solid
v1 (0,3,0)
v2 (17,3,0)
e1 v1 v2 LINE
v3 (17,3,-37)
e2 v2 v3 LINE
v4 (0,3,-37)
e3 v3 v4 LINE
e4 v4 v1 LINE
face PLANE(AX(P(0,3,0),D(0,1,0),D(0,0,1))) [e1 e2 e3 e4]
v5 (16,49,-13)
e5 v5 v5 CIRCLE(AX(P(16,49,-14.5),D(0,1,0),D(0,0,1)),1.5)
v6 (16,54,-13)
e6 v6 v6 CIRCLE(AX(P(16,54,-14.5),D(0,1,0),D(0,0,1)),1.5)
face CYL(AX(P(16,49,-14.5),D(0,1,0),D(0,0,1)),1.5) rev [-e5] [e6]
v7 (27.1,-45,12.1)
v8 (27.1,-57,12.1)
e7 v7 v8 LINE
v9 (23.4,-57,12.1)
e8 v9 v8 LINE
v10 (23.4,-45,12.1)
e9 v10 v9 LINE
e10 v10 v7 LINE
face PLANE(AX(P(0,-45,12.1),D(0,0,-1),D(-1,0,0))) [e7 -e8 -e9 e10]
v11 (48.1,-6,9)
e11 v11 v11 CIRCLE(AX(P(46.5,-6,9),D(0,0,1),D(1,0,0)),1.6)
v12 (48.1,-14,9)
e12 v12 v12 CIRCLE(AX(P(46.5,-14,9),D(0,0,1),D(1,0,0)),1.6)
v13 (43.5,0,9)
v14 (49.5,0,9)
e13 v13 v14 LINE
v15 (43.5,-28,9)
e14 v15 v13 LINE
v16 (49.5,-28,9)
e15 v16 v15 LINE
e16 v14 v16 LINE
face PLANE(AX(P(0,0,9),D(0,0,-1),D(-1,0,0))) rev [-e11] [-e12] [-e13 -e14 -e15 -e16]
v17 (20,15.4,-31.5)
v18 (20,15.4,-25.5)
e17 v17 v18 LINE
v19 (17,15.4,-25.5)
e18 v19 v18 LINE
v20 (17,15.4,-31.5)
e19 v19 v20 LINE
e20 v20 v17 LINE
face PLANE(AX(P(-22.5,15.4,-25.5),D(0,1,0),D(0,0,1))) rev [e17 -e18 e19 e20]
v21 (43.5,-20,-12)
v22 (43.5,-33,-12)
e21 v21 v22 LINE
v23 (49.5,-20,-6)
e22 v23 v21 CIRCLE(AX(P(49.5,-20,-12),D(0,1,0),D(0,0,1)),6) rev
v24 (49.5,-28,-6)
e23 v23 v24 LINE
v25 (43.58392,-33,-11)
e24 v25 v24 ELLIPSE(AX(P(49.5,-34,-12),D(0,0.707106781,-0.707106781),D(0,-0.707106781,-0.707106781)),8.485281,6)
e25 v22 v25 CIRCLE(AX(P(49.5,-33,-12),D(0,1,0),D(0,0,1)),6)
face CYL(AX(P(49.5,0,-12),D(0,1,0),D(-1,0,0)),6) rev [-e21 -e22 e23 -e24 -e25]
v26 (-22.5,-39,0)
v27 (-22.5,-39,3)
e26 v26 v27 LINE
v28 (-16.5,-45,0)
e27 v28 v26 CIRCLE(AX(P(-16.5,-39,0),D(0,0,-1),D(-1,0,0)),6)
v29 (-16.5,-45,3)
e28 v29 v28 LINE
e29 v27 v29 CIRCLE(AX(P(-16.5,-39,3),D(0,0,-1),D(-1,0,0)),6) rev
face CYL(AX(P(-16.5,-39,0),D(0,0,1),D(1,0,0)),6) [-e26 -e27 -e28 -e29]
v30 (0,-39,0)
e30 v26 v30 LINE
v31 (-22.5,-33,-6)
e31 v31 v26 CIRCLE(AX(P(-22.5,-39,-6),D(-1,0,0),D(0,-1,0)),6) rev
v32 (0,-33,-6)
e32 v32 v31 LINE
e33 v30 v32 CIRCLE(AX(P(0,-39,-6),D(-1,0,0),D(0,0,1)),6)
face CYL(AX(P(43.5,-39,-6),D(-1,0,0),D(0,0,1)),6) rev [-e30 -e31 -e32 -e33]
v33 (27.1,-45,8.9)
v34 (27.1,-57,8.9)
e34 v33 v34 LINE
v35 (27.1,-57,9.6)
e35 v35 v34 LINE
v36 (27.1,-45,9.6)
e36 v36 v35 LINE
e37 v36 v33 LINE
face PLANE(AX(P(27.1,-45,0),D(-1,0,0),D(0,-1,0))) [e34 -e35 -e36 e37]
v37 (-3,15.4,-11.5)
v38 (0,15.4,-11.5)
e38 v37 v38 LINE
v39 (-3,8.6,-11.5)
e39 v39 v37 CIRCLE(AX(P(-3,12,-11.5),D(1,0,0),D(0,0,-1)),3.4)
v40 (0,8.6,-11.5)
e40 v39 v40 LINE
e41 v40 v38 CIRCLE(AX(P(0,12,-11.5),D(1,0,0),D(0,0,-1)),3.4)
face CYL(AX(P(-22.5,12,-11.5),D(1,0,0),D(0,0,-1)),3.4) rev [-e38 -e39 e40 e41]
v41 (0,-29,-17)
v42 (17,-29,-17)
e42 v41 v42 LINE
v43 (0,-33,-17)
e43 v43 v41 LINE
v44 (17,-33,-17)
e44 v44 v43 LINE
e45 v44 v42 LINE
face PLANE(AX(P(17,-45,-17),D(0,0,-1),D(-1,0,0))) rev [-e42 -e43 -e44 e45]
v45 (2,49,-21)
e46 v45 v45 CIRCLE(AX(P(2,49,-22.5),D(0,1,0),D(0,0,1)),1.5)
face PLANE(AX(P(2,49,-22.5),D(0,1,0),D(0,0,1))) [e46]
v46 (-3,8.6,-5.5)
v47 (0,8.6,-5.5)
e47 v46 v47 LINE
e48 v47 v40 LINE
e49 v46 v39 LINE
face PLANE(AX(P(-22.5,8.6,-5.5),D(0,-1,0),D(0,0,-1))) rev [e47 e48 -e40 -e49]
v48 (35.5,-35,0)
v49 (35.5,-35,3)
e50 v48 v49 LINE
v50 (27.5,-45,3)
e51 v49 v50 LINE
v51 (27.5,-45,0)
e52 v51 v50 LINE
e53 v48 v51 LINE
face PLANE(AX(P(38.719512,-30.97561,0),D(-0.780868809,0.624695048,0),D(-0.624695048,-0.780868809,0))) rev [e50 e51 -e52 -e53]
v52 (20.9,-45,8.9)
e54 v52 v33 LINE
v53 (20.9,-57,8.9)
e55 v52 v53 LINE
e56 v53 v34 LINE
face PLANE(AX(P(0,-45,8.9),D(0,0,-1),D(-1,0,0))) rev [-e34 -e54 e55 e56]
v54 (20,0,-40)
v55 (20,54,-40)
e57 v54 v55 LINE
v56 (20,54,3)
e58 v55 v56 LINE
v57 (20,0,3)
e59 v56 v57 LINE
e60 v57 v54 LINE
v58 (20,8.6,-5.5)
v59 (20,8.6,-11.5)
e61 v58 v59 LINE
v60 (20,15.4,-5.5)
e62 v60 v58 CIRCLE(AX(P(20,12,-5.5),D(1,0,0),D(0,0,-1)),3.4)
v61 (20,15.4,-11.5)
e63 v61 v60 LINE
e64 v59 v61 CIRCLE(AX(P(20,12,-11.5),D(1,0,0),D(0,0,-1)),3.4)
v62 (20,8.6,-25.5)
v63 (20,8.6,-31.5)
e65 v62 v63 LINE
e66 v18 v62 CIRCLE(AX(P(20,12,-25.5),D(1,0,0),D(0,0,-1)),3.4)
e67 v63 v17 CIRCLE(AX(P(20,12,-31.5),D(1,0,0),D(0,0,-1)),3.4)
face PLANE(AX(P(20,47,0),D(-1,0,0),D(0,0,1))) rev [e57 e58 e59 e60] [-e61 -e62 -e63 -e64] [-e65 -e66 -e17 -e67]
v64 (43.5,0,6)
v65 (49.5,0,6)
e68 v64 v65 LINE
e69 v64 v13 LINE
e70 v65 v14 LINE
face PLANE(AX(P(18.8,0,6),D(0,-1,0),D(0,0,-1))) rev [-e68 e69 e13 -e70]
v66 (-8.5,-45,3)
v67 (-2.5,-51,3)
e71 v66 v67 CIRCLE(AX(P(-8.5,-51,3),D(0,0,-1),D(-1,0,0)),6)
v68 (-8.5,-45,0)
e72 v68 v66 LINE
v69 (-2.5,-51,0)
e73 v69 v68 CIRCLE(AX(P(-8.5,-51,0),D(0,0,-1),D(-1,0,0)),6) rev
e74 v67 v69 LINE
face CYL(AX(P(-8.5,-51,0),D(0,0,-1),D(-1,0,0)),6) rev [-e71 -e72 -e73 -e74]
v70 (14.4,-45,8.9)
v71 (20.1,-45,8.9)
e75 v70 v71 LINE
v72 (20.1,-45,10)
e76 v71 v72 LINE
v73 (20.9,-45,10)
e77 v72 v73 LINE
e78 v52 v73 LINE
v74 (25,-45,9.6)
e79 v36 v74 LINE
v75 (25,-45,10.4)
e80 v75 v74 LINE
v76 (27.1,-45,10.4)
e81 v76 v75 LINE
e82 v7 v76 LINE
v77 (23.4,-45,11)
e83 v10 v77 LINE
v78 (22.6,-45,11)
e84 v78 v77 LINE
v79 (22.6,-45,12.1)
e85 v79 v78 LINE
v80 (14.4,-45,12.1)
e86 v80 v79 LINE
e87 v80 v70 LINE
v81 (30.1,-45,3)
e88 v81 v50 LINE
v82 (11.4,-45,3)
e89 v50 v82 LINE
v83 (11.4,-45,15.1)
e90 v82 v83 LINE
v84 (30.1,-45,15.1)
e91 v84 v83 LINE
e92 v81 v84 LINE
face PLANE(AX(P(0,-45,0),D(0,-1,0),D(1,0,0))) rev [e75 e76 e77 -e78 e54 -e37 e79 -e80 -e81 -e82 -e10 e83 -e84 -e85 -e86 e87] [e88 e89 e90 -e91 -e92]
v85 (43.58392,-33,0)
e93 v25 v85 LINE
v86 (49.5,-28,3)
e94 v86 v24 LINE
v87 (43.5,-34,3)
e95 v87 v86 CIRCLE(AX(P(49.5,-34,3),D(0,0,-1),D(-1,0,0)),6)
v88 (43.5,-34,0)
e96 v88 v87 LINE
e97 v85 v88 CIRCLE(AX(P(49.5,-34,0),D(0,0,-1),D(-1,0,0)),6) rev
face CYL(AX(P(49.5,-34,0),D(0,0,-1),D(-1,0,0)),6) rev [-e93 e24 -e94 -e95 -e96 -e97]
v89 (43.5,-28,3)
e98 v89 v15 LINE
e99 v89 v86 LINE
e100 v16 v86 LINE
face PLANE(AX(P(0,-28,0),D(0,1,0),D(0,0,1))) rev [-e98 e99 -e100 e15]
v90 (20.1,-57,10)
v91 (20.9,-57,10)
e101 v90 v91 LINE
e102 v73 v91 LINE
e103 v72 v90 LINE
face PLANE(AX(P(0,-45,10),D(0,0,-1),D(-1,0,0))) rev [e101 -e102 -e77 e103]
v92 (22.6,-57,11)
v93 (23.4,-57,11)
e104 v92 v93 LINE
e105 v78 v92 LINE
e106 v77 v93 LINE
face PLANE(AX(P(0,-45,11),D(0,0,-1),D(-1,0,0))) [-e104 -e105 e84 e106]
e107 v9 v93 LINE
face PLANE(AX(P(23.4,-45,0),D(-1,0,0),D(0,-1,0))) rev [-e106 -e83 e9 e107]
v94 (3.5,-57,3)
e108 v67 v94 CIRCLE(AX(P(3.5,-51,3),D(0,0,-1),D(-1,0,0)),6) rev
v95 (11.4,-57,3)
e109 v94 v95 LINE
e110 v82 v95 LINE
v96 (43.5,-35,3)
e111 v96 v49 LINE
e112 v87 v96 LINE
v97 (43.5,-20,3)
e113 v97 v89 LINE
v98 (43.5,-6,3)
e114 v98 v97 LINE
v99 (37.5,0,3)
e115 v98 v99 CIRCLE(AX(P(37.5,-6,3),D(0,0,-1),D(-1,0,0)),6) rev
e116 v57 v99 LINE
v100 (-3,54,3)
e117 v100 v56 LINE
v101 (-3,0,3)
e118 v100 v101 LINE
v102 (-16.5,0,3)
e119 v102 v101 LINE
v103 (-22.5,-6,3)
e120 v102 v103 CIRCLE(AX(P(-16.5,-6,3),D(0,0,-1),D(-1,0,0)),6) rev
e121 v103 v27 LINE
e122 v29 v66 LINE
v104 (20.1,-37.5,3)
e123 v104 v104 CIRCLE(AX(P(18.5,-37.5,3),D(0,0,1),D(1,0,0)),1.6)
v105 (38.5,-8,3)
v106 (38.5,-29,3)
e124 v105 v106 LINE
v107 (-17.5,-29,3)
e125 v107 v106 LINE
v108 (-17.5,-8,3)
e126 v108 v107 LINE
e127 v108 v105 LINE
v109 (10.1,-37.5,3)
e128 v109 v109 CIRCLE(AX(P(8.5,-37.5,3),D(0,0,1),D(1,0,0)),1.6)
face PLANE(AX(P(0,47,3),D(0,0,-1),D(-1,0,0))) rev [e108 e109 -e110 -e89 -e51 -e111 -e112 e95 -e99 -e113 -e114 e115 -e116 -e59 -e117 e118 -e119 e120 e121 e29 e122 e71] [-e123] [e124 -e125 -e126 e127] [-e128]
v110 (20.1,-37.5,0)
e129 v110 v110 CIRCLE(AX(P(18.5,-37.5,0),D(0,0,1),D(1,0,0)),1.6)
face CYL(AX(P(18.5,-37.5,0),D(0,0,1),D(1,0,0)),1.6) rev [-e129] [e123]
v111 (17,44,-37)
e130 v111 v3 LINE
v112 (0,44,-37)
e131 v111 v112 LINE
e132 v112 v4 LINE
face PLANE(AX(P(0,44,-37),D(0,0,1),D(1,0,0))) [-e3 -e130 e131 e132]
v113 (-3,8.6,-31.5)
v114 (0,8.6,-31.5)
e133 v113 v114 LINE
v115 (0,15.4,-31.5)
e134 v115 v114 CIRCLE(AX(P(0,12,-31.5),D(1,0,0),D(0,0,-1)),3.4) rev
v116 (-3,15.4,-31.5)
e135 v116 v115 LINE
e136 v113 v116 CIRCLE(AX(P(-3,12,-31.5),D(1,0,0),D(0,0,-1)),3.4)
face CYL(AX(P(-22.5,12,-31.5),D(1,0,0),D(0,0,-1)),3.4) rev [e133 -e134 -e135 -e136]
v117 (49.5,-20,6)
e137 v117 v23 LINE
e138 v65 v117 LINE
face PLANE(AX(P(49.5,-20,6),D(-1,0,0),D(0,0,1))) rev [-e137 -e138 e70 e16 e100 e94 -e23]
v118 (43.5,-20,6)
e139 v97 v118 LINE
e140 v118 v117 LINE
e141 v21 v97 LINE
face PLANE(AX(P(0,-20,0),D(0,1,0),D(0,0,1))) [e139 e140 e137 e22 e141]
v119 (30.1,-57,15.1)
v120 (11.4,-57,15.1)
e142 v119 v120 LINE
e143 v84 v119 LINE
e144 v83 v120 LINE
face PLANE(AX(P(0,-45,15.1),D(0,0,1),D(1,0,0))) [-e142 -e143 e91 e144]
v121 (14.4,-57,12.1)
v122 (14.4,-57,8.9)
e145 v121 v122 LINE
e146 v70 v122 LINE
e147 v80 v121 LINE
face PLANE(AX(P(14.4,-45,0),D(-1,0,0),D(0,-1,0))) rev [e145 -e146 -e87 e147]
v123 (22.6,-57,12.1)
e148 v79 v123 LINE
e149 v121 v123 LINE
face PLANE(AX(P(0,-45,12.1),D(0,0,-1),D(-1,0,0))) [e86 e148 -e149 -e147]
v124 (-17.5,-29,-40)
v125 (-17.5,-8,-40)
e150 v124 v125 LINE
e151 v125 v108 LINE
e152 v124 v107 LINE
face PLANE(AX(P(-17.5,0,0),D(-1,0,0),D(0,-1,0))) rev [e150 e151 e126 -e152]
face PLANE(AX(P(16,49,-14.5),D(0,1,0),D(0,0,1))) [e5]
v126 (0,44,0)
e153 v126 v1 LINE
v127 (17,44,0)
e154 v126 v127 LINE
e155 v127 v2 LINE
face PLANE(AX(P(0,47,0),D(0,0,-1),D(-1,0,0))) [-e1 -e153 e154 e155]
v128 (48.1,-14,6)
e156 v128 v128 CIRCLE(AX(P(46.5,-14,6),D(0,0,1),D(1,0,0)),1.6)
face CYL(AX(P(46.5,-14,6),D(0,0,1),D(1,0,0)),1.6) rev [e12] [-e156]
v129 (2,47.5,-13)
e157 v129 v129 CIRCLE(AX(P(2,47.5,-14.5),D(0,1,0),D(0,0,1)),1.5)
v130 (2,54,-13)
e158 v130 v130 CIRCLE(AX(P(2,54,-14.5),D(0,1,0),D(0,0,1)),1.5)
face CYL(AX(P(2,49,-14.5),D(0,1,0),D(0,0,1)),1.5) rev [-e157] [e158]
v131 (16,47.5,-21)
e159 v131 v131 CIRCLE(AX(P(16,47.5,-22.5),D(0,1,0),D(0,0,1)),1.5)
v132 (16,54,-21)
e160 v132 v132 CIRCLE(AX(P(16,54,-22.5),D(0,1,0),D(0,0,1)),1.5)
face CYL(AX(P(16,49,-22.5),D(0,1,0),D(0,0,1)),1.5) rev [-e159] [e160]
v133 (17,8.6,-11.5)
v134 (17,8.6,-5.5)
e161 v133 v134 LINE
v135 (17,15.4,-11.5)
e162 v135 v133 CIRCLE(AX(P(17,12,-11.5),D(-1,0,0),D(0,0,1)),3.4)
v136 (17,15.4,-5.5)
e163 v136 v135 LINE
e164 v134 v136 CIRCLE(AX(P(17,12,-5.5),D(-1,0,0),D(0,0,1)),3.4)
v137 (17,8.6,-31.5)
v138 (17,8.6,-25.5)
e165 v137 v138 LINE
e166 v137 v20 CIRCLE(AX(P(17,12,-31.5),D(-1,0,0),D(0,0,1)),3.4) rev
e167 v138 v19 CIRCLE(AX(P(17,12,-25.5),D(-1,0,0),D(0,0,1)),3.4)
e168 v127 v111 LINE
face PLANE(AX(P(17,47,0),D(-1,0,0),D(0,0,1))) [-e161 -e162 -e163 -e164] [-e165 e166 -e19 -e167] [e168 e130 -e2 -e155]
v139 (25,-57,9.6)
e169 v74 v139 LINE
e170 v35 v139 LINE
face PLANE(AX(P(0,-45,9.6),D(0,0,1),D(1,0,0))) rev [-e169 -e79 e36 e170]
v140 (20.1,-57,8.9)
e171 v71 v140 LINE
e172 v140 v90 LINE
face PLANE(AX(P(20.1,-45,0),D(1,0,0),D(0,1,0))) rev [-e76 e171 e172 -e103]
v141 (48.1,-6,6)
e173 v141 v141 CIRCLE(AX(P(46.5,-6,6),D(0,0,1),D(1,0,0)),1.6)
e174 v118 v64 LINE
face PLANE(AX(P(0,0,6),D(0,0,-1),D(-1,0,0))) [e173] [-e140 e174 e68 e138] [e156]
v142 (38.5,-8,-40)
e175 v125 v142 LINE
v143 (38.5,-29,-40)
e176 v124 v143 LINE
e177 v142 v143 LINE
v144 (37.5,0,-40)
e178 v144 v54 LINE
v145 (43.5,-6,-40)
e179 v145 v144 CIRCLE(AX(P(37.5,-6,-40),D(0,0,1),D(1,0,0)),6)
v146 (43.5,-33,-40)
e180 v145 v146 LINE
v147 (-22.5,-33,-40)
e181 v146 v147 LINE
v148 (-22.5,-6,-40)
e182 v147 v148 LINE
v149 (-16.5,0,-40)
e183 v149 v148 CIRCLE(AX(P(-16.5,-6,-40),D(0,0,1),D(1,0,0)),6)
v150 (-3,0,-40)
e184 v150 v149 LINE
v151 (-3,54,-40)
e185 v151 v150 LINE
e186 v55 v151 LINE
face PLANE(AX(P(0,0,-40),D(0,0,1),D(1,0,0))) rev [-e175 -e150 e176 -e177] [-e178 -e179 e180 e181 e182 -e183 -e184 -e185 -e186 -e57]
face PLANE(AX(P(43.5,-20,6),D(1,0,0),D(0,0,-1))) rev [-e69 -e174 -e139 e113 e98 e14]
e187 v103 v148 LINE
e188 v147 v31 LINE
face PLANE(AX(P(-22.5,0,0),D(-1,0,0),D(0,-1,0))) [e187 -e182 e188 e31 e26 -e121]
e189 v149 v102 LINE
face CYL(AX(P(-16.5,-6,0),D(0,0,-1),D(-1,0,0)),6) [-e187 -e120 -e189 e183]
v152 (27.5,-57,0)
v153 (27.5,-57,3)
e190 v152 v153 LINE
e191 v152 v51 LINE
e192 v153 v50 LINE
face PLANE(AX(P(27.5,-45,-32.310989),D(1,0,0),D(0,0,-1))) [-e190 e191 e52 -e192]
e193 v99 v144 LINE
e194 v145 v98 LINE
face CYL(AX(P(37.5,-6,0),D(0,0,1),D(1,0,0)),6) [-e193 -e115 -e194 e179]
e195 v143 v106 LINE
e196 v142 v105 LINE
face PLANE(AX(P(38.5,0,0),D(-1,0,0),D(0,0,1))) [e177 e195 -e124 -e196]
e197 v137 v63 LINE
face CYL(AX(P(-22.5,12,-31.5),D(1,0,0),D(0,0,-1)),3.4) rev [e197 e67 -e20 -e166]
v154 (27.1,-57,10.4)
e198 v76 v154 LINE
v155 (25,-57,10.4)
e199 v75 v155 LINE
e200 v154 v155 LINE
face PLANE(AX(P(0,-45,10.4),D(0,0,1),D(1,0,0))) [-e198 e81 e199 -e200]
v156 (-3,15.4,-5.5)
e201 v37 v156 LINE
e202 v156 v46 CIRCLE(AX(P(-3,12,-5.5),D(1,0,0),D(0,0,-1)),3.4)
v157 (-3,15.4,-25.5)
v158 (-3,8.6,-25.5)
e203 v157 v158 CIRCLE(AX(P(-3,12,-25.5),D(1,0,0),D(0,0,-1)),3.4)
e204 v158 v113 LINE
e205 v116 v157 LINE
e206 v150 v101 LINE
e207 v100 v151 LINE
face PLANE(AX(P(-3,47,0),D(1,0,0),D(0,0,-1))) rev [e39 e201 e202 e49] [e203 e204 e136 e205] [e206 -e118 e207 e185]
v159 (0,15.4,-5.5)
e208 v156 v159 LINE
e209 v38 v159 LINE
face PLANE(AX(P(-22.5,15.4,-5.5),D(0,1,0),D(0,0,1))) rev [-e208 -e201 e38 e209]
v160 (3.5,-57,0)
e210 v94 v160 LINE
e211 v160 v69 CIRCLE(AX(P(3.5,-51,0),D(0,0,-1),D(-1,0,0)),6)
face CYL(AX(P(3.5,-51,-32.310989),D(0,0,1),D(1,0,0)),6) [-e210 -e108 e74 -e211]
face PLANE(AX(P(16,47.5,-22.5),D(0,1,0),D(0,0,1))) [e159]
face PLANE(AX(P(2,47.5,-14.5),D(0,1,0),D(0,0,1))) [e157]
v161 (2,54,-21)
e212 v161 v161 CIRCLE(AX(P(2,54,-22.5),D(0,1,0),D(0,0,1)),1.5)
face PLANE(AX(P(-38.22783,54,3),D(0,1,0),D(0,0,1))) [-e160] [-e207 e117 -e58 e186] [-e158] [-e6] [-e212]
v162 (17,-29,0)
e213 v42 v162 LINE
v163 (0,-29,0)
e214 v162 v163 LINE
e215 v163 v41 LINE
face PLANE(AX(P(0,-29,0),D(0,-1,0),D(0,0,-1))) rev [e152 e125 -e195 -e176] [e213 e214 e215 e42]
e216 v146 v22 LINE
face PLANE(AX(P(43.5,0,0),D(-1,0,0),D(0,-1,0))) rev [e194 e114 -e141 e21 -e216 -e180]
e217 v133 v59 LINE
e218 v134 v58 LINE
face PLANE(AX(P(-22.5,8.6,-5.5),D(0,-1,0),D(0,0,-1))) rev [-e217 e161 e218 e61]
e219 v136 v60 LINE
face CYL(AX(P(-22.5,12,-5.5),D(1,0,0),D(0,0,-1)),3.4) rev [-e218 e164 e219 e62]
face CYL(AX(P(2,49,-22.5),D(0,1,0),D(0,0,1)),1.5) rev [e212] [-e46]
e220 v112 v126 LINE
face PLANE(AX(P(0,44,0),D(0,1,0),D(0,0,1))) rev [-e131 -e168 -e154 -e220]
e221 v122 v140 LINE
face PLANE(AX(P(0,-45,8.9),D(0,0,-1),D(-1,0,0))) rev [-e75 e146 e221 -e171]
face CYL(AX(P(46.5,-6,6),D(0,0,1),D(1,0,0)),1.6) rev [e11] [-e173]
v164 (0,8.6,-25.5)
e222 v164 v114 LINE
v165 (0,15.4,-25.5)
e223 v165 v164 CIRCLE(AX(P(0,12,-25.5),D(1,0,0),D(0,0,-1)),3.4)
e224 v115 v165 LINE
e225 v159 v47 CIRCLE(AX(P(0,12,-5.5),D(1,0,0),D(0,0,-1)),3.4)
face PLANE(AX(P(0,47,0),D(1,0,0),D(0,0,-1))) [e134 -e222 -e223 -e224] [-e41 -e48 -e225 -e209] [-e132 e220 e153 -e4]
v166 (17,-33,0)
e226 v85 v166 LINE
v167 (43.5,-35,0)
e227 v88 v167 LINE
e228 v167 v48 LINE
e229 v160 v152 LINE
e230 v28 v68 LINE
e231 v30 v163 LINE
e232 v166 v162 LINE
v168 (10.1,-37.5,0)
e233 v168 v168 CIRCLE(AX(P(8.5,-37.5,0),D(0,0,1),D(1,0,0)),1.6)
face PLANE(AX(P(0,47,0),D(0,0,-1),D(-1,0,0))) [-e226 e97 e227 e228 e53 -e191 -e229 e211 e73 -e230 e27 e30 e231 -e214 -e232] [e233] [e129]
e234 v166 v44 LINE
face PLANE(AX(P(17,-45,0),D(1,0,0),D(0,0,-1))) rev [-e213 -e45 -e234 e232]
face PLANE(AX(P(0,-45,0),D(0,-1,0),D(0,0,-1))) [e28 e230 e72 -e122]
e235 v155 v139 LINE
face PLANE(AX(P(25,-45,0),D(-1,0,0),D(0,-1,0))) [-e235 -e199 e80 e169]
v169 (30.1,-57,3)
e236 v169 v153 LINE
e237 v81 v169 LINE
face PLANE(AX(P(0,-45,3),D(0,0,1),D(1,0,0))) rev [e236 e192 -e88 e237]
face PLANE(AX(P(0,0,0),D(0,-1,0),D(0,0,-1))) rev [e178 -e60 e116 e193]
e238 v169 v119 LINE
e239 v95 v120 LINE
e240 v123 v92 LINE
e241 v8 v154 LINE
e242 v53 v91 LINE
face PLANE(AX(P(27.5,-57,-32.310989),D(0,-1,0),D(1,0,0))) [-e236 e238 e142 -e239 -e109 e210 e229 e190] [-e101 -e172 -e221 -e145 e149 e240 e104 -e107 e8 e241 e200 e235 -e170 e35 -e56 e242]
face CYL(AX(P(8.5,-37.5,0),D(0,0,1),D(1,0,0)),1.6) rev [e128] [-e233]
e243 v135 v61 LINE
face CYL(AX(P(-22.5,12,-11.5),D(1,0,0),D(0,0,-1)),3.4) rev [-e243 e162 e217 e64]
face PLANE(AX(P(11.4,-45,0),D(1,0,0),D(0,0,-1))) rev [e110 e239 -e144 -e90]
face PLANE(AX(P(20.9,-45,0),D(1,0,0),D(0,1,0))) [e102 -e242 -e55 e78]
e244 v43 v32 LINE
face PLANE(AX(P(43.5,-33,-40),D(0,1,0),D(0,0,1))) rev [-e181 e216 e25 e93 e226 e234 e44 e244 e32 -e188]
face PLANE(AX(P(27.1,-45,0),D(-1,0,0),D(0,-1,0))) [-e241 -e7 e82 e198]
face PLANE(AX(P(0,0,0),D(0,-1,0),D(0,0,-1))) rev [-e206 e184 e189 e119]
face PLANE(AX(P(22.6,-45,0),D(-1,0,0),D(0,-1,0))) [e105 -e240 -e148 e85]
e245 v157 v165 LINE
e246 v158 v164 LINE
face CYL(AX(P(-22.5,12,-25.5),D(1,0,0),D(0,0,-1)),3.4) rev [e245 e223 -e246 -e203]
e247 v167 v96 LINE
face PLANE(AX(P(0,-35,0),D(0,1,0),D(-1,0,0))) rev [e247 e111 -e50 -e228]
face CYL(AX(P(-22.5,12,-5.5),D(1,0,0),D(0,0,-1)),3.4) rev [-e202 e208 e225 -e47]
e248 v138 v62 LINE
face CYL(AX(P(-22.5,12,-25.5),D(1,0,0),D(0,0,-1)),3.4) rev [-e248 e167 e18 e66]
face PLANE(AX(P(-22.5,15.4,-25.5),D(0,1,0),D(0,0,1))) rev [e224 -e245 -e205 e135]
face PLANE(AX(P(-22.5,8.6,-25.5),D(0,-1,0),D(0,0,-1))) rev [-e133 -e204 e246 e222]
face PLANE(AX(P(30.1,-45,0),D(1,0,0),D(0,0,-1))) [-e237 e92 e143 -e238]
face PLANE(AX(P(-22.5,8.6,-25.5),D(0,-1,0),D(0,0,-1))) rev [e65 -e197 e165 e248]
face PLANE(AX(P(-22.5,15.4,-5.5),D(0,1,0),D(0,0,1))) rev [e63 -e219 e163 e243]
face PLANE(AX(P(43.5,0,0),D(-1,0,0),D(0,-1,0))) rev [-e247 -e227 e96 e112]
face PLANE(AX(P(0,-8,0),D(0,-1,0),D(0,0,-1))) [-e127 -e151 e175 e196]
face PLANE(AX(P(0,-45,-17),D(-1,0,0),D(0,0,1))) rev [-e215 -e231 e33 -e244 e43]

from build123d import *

# Parameters (mm, degrees)
SKETCH_2_W           = 17
SKETCH_2_H           = 17
EXTRUDE_1_DEPTH      = 47
SHELL_2_T            = 3
SKETCH_8_R           = 1.6
SKETCH_8_W           = 56
SKETCH_8_H           = 21
EXTRUDE_2_DEPTH      = 3
SKETCH_9_W           = 66
SKETCH_9_H           = 4
EXTRUDE_3_DEPTH      = 40
SKETCH_11_W          = 13
SKETCH_11_H          = 13
CUT_EXTRUDE_3_DEPTH  = 3
EXTRUDE_START        = -48
SKETCH_13_W          = 17
SKETCH_13_H          = 17
EXTRUDE_4_DEPTH      = 3
SKETCH_17_W          = 17
SKETCH_17_H          = 17
CUT_EXTRUDE_4_DEPTH  = 78.409624725
SKETCH_19_W          = 30
SKETCH_19_H          = 12
EXTRUDE_8_DEPTH      = 3
SKETCH_20_W          = 0.8
SKETCH_20_H          = 1.1
SKETCH_20_W_2        = 2.1
SKETCH_20_H_2        = 0.8
EXTRUDE_9_DEPTH      = 12
FILLET_5_R           = 6
EXTRUDE_11_DEPTH     = 20
EXTRUDE_START_2      = 3
SKETCH_23_W          = 6
SKETCH_23_H          = 28
SKETCH_23_R          = 1.6
EXTRUDE_12_DEPTH     = 3
EXTRUDE_START_3      = -28
SKETCH_24_W          = 6
SKETCH_24_H          = 12
EXTRUDE_13_DEPTH     = 8
FILLET_START         = -40
FILLET_6_DEPTH       = 43
FILLET_START_2       = -6
FILLET_6_2_DEPTH     = 9
FILLET_START_3       = -33
FILLET_6_3_DEPTH     = 13
FILLET_START_4       = -11
FILLET_6_4_DEPTH     = 11
EXTRUDE_START_4      = 12
EXTRUDE_14_DEPTH     = 12
SKETCH_26_W          = 17
SKETCH_26_H          = 29
CUT_EXTRUDE_6_DEPTH  = 50
SKETCH_29_W          = 35
SKETCH_29_H          = 4
EXTRUDE_15_DEPTH     = 23
SKETCH_30_W          = 23
SKETCH_30_H          = 35
EXTRUDE_16_DEPTH     = 10
EXTRUDE_START_5      = 8
EXTRUDE_17_DEPTH     = 8
CUT_EXTRUDE_10_DEPTH = 82.579715616
SKETCH_33_W          = 17
SKETCH_33_H          = 37
CUT_EXTRUDE_11_DEPTH = 44
SKETCH_35_W          = 17
SKETCH_35_H          = 37
EXTRUDE_18_DEPTH     = 3
SKETCH_31_R          = 1.5
CUT_EXTRUDE_13_DEPTH = 5
SKETCH_39_R          = 1.5
CUT_EXTRUDE_14_DEPTH = 1.5


with BuildPart() as part:
    # 草图2 → 凸台-拉伸1 (new body)
    with BuildSketch(Plane(origin=(0, 0, 0), x_dir=(1, 0, 0), z_dir=(0, 1, 0))):
        with Locations((8.5, 8.5)):
            Rectangle(SKETCH_2_W, SKETCH_2_H)
    extrude(amount=EXTRUDE_1_DEPTH)

    # 抽壳2
    shell_2_openings = [part.faces().sort_by_distance(p)[0] for p in [
        (8.5, 0, -8.5),
    ]]
    offset(amount=SHELL_2_T, openings=shell_2_openings, kind=Kind.INTERSECTION)

    # 草图8 → 凸台-拉伸2 (add)
    with BuildSketch(Plane.XY.offset(3)):
        Polygon((-22.5, 0), (43.5, 0), (43.5, -35), (35.5, -35), (27.5, -45), (-22.5, -45), align=None)
        with Locations((8.5, -37.5)):
            Circle(SKETCH_8_R, mode=Mode.SUBTRACT)
        with Locations((18.5, -37.5)):
            Circle(SKETCH_8_R, mode=Mode.SUBTRACT)
        with Locations((10.5, -18.5)):
            Rectangle(SKETCH_8_W, SKETCH_8_H, mode=Mode.SUBTRACT)
    extrude(amount=-EXTRUDE_2_DEPTH)

    # 草图9 → 凸台-拉伸3 (add)
    with BuildSketch(Plane(origin=(0, 0, 0), x_dir=(-1, 0, 0), z_dir=(0, 0, -1))):
        with Locations((-10.5, -31)):
            Rectangle(SKETCH_9_W, SKETCH_9_H)
    extrude(amount=EXTRUDE_3_DEPTH)

    # 草图11 → 切除-拉伸3 (cut)
    with BuildSketch(Plane(origin=(0, 50, 0), x_dir=(1, 0, 0), z_dir=(0, 1, 0))):
        with Locations((8.5, 8.5)):
            Rectangle(SKETCH_11_W, SKETCH_11_H)
    extrude(amount=-CUT_EXTRUDE_3_DEPTH, mode=Mode.SUBTRACT)

    # 草图13 → 凸台-拉伸4 (add)
    with BuildSketch(Plane(origin=(0, 50, 0), x_dir=(1, 0, 0), z_dir=(0, 1, 0)).offset(EXTRUDE_START)):
        with Locations((8.5, 8.5)):
            Rectangle(SKETCH_13_W, SKETCH_13_H)
    extrude(amount=EXTRUDE_4_DEPTH)

    # 草图17 → 切除-拉伸4 (cut, through all)
    with BuildSketch(Plane(origin=(0, 5, 0), x_dir=(1, 0, 0), z_dir=(0, 1, 0))):
        with Locations((8.5, 8.5)):
            Rectangle(SKETCH_17_W, SKETCH_17_H)
    extrude(amount=-CUT_EXTRUDE_4_DEPTH, mode=Mode.SUBTRACT)

    # 草图19 → 凸台-拉伸8 (add)
    with BuildSketch(Plane.XY.offset(3)):
        with Locations((12.5, -51)):
            Rectangle(SKETCH_19_W, SKETCH_19_H)
    extrude(amount=-EXTRUDE_8_DEPTH)

    # 草图20 → 凸台-拉伸9 (add)
    # profile 1 of 4: a face of its own
    with BuildSketch(Plane.XZ.offset(57)):
        Polygon((27.5, 3), (30.1, 3), (30.1, 15.1), (11.4, 15.1), (11.4, 3), align=None)
        Polygon((14.4, 8.9), (14.4, 12.1), (22.6, 12.1), (23.4, 12.1), (27.1, 12.1), (27.1, 10.4), (27.1, 9.6), (27.1, 8.9), (20.9, 8.9), (20.1, 8.9), align=None, mode=Mode.SUBTRACT)
    # profile 2 of 4: a face of its own
    with BuildSketch(Plane.XZ.offset(57)):
        with Locations((23, 11.55)):
            Rectangle(SKETCH_20_W, SKETCH_20_H)
    # profile 3 of 4: a face of its own
    with BuildSketch(Plane.XZ.offset(57)):
        with Locations((20.5, 9.45)):
            Rectangle(SKETCH_20_W, SKETCH_20_H)
    # profile 4 of 4: a face of its own
    with BuildSketch(Plane.XZ.offset(57)):
        with Locations((26.05, 10)):
            Rectangle(SKETCH_20_W_2, SKETCH_20_H_2)
    extrude(amount=-EXTRUDE_9_DEPTH)

    # 圆角5
    fillet_5_edges = [part.edges().sort_by_distance(p)[0] for p in [
        (-11.25, -33, 0),
        (-22.5, -45, 1.5),
        (-2.5, -57, 1.5),
        (-2.5, -45, 1.5),
    ]]
    fillet(fillet_5_edges, radius=FILLET_5_R - 0.0001)  # a hair under: the kernel refuses the full size

    # 草图22 → 凸台-拉伸11 (add)
    with BuildSketch(Plane(origin=(0, 0, 0), x_dir=(-1, 0, 0), z_dir=(0, 0, -1))):
        Polygon((0, 0), (-17, 0), (-20, 0), (-43.5, 0), (-43.5, -29), (-38.5, -29), (-38.5, -8), (17.5, -8), (17.5, -29), (22.5, -29), (22.5, 0), (3, 0), align=None)
    extrude(amount=EXTRUDE_11_DEPTH)



with BuildPart() as body_2:
    # 草图23 → 凸台-拉伸12 (new body)
    with BuildSketch(Plane.XY.offset(3).offset(EXTRUDE_START_2)):
        with Locations((46.5, -14)):
            Rectangle(SKETCH_23_W, SKETCH_23_H)
        with Locations((46.5, -6)):
            Circle(SKETCH_23_R, mode=Mode.SUBTRACT)
        with Locations((46.5, -14)):
            Circle(SKETCH_23_R, mode=Mode.SUBTRACT)
    extrude(amount=EXTRUDE_12_DEPTH)


with BuildPart() as part_1:
    add(part.part)

    add(body_2.part)  # 凸台-拉伸13 merges body 2
    # 草图24 → 凸台-拉伸13 (add)
    with BuildSketch(Plane(origin=(0, 0, 0), x_dir=(1, 0, 0), z_dir=(0, 1, 0)).offset(EXTRUDE_START_3)):
        with Locations((46.5, 0)):
            Rectangle(SKETCH_24_W, SKETCH_24_H)
    extrude(amount=EXTRUDE_13_DEPTH)

    # 圆角6: read off the stored shape, not the designer's step
    # 圆角6 outline → 圆角6 (cut)
    with BuildSketch(Plane.XY.offset(FILLET_START)):
        with BuildLine():
            ThreePointArc((37.5, 0), (41.742640687, -1.757359313), (43.5, -6))
            Line((43.5, -6), (43.5, 0))
            Line((43.5, 0), (37.5, 0))
        make_face()
        with BuildLine():
            Line((-22.5, 0), (-22.5, -6))
            ThreePointArc((-22.5, -6), (-20.742640687, -1.757359313), (-16.5, 0))
            Line((-16.5, 0), (-22.5, 0))
        make_face()
    extrude(amount=FILLET_6_DEPTH, mode=Mode.SUBTRACT)

    # Fillet 6 2 outline → Fillet 6 2 (add)
    with BuildSketch(Plane.XY.offset(FILLET_START_2)):
        with BuildLine():
            Line((43.5, -28), (43.5, -34))
            ThreePointArc((43.5, -34), (45.257359313, -29.757359313), (49.5, -28))
            Line((49.5, -28), (43.5, -28))
        make_face()
    extrude(amount=FILLET_6_2_DEPTH)

    # Fillet 6 3 outline → Fillet 6 3 (add)
    with BuildSketch(Plane(origin=(0, 0, 0), x_dir=(1, 0, 0), z_dir=(0, 1, 0)).offset(FILLET_START_3)):
        with BuildLine():
            ThreePointArc((49.5, 6), (45.257359313, 7.757359313), (43.5, 12))
            Line((43.5, 12), (43.5, 6))
            Line((43.5, 6), (49.5, 6))
        make_face()
    extrude(amount=FILLET_6_3_DEPTH)

    # Fillet 6 4 outline → Fillet 6 4 (cut)
    with BuildSketch(Plane.XY.offset(FILLET_START_4)):
        with BuildLine():
            ThreePointArc((49.5, -28), (45.627016654, -29.417424305), (43.583920217, -33))
            Line((43.583920217, -33), (49.5, -33))
            Line((49.5, -33), (49.5, -28))
        make_face()
        with BuildLine():
            ThreePointArc((43.5, -34), (43.521016863, -33.498242438), (43.583920217, -33))
            Line((43.583920217, -33), (43.5, -33))
            Line((43.5, -33), (43.5, -34))
        make_face()
    extrude(amount=FILLET_6_4_DEPTH, mode=Mode.SUBTRACT)

    # 草图25 → 凸台-拉伸14 (add)
    with BuildSketch(Plane(origin=(0, 0, -20), x_dir=(-1, 0, 0), z_dir=(0, 0, -1)).offset(EXTRUDE_START_4)):
        with BuildLine():
            Line((22.5, -29), (22.5, -6))
            ThreePointArc((22.5, -6), (20.742640687, -1.757359313), (16.5, 0))
            Line((16.5, 0), (3, 0))
            Line((3, 0), (3, 50))
            Line((3, 50), (-20, 50))
            Line((-20, 50), (-20, 0))
            Line((-20, 0), (-37.5, 0))
            ThreePointArc((-37.5, 0), (-41.742640687, -1.757359313), (-43.5, -6))
            Line((-43.5, -6), (-43.5, -29))
            Line((-43.5, -29), (-38.5, -29))
            Line((-38.5, -29), (-38.5, -8))
            Line((-38.5, -8), (17.5, -8))
            Line((17.5, -8), (17.5, -29))
            Line((17.5, -29), (22.5, -29))
        make_face()
    extrude(amount=-EXTRUDE_14_DEPTH)

    # 草图26 → 切除-拉伸6 (cut)
    with BuildSketch(Plane(origin=(0, 50, 0), x_dir=(1, 0, 0), z_dir=(0, 1, 0))):
        with Locations((8.5, 14.5)):
            Rectangle(SKETCH_26_W, SKETCH_26_H)
    extrude(amount=-CUT_EXTRUDE_6_DEPTH, mode=Mode.SUBTRACT)

    # 草图29 → 凸台-拉伸15 (add)
    with BuildSketch(Plane(origin=(20, 0, 0), x_dir=(0, 0, -1), z_dir=(1, 0, 0))):
        with Locations((14.5, 52)):
            Rectangle(SKETCH_29_W, SKETCH_29_H)
    extrude(amount=-EXTRUDE_15_DEPTH)

    # 草图30 → 凸台-拉伸16 (add)
    with BuildSketch(Plane(origin=(0, 54, 0), x_dir=(1, 0, 0), z_dir=(0, 1, 0))):
        with Locations((8.5, 14.5)):
            Rectangle(SKETCH_30_W, SKETCH_30_H)
    extrude(amount=-EXTRUDE_16_DEPTH)

    # 草图32 → 凸台-拉伸17 (add)
    with BuildSketch(Plane(origin=(0, 0, -32), x_dir=(-1, 0, 0), z_dir=(0, 0, -1)).offset(EXTRUDE_START_5)):
        with BuildLine():
            Line((-20, 0), (-37.5, 0))
            ThreePointArc((-37.5, 0), (-41.742640687, -1.757359313), (-43.5, -6))
            Line((-43.5, -6), (-43.5, -29))
            Line((-43.5, -29), (-38.5, -29))
            Line((-38.5, -29), (-38.5, -8))
            Line((-38.5, -8), (17.5, -8))
            Line((17.5, -8), (17.5, -29))
            Line((17.5, -29), (22.5, -29))
            Line((22.5, -29), (22.5, -6))
            ThreePointArc((22.5, -6), (20.742640687, -1.757359313), (16.5, 0))
            Line((16.5, 0), (3, 0))
            Line((3, 0), (3, 54))
            Line((3, 54), (-20, 54))
            Line((-20, 54), (-20, 0))
        make_face()
    extrude(amount=-EXTRUDE_17_DEPTH)

    # 草图34 → 切除-拉伸10 (cut, through all)
    with BuildSketch(Plane(origin=(20, 0, 0), x_dir=(0, 0, -1), z_dir=(1, 0, 0))):
        with BuildLine():
            Line((5.5, 15.4), (11.5, 15.4))
            ThreePointArc((11.5, 15.4), (14.9, 12), (11.5, 8.6))
            Line((11.5, 8.6), (5.5, 8.6))
            ThreePointArc((5.5, 8.6), (2.1, 12), (5.5, 15.4))
        make_face()
        with BuildLine():
            Line((25.5, 15.4), (31.5, 15.4))
            ThreePointArc((31.5, 15.4), (34.9, 12), (31.5, 8.6))
            Line((31.5, 8.6), (25.5, 8.6))
            ThreePointArc((25.5, 8.6), (22.1, 12), (25.5, 15.4))
        make_face()
    extrude(amount=-CUT_EXTRUDE_10_DEPTH, mode=Mode.SUBTRACT)

    # 草图33 → 切除-拉伸11 (cut)
    with BuildSketch(Plane(origin=(0, 0, 0), x_dir=(1, 0, 0), z_dir=(0, 1, 0))):
        with Locations((8.5, 18.5)):
            Rectangle(SKETCH_33_W, SKETCH_33_H)
    extrude(amount=CUT_EXTRUDE_11_DEPTH, mode=Mode.SUBTRACT)

    # 草图35 → 凸台-拉伸18 (add)
    with BuildSketch(Plane(origin=(0, 0, 0), x_dir=(1, 0, 0), z_dir=(0, 1, 0))):
        with Locations((8.5, 18.5)):
            Rectangle(SKETCH_35_W, SKETCH_35_H)
    extrude(amount=EXTRUDE_18_DEPTH)

    # 草图31 → 切除-拉伸13 (cut)
    with BuildSketch(Plane(origin=(0, 54, 0), x_dir=(1, 0, 0), z_dir=(0, 1, 0))):
        with Locations(Location((2, 22.5, 0), (0, 0, 270))):
            Circle(SKETCH_31_R)
        with Locations(Location((2, 14.5, 0), (0, 0, 270))):
            Circle(SKETCH_31_R)
        with Locations(Location((16, 22.5, 0), (0, 0, 270))):
            Circle(SKETCH_31_R)
        with Locations(Location((16, 14.5, 0), (0, 0, 270))):
            Circle(SKETCH_31_R)
    extrude(amount=-CUT_EXTRUDE_13_DEPTH, mode=Mode.SUBTRACT)

    # 草图39 → 切除-拉伸14 (cut)
    with BuildSketch(Plane(origin=(0, 49, 0), x_dir=(1, 0, 0), z_dir=(0, 1, 0))):
        with Locations(Location((2, 14.5, 0), (0, 0, 270))):
            Circle(SKETCH_39_R)
        with Locations(Location((16, 22.5, 0), (0, 0, 270))):
            Circle(SKETCH_39_R)
    extrude(amount=-CUT_EXTRUDE_14_DEPTH, mode=Mode.SUBTRACT)


solid = part_1.part
